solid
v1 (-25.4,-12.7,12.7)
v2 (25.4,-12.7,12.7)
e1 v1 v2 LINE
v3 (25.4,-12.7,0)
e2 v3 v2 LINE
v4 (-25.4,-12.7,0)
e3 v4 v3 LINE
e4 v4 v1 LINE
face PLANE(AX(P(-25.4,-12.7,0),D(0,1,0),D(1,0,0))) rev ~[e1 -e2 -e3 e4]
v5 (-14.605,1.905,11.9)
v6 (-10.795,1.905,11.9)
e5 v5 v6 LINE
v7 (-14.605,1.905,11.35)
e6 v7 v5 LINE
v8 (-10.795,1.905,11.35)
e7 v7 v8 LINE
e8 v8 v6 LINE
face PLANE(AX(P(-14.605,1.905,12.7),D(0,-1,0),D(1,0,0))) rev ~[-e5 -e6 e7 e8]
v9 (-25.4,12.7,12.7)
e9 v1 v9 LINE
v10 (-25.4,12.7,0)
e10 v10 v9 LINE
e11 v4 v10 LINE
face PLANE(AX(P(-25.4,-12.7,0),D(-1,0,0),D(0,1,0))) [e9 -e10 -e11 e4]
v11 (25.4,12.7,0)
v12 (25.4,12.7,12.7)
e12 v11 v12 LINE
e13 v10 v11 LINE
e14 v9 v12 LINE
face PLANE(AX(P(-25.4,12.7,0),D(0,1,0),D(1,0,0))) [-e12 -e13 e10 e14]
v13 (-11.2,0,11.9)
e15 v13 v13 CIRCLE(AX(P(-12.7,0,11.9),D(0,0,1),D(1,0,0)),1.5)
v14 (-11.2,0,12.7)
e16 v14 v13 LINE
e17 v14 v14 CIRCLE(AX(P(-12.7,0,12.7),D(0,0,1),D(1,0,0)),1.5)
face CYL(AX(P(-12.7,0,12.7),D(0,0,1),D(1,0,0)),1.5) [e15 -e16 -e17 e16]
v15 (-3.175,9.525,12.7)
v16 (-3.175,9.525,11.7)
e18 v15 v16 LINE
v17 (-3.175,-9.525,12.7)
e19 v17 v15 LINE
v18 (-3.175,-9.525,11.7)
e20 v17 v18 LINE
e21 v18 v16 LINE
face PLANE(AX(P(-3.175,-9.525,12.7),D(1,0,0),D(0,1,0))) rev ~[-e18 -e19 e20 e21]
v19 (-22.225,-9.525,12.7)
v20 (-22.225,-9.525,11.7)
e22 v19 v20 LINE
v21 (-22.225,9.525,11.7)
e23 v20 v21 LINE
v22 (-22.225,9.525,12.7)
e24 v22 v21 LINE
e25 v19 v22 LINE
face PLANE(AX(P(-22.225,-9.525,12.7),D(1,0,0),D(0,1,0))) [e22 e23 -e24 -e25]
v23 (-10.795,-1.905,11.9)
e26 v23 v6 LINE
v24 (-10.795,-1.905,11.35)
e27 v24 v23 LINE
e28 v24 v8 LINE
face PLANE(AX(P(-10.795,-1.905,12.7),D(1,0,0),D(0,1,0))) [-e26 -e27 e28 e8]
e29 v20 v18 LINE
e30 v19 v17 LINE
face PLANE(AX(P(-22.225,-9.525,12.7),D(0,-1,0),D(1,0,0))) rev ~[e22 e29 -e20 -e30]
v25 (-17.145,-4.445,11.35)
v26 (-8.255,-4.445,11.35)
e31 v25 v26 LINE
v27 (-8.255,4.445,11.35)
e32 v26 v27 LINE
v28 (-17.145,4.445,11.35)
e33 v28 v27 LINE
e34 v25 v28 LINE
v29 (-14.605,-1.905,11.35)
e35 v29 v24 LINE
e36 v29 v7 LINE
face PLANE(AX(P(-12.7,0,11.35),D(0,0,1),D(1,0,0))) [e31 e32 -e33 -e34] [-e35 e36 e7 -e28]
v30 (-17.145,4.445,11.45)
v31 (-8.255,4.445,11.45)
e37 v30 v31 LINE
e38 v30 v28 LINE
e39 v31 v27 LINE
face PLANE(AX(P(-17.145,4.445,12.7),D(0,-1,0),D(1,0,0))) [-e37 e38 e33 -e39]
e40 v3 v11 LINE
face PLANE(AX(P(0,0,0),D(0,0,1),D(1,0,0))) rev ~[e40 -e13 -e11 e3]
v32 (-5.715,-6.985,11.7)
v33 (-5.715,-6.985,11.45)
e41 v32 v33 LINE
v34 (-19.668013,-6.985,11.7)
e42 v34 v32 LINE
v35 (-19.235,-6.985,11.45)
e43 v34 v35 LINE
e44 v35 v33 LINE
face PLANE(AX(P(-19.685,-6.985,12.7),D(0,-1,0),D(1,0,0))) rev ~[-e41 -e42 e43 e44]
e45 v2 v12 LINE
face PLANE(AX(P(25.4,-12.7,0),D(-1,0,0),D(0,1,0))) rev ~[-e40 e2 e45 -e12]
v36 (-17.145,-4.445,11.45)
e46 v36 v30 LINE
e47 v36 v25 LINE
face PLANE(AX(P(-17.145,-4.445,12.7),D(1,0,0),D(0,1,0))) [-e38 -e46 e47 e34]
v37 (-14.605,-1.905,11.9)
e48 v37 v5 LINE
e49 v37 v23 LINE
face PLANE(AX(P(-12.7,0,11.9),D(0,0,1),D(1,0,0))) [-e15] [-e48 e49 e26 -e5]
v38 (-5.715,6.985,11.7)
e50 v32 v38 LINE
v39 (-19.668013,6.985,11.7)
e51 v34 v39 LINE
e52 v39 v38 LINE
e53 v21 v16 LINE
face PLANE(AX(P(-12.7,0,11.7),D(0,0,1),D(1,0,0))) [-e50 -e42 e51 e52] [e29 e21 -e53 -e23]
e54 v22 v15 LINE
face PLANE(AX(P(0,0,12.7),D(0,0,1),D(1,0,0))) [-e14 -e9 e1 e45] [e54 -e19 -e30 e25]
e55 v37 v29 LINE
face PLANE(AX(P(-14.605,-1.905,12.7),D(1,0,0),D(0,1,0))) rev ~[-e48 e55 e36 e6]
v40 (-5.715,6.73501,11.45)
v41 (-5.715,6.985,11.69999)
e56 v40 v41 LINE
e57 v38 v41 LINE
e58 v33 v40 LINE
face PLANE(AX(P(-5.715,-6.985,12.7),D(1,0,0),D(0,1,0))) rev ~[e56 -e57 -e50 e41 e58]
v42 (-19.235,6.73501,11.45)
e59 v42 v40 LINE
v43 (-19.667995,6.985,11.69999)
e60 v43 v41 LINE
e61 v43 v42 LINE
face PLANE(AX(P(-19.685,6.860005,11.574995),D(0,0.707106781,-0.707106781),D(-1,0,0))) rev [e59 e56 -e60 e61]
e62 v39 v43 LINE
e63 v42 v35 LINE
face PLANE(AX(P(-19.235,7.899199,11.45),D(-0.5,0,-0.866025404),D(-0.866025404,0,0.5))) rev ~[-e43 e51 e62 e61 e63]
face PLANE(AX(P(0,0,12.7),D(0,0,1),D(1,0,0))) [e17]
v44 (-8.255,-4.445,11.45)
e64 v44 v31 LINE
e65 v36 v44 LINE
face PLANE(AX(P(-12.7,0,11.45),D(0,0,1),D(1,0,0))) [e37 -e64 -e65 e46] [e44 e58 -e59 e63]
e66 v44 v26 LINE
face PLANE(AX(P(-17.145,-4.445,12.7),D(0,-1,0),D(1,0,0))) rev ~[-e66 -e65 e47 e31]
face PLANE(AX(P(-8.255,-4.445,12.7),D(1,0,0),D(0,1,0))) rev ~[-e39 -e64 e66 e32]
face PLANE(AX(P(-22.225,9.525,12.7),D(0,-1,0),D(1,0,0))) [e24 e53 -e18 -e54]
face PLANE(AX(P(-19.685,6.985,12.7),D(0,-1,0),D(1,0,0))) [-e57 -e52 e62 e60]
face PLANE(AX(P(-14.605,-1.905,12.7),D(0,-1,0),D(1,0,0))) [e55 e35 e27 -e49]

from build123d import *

# Parameters (mm, degrees)
F0_W        = 50.8
F0_H        = 25.4
F1_DEPTH    = 12.7
F2_W        = 19.05
F2_H        = 19.05
F2_W_2      = 13.97
F2_H_2      = 13.97
F2_W_3      = 8.89
F2_H_3      = 8.89
F2_W_4      = 3.81
F2_H_4      = 3.81
F3_DEPTH    = 1
F4_DEPTH    = 1.25
F5_DEPTH    = 1.35
F6_SIZE2    = 0.24999
F6_SIZE     = 0.24999
F7_T4_DEPTH = 16.0483871792
F8_W        = 3.81
F8_H        = 3.81
F8_R        = 1.5
F9_DEPTH    = 0.8


# Not quite as in the source:
# - a fillet or chamfer that OpenCascade refuses, or shapes differently, is made with other operations: its cross-section is extruded or revolved along the edge and cut away or added
# - a fillet or chamfer is up to 0.001 mm smaller than in the source, because OpenCascade refuses the exact size


with BuildPart() as f1:
    # F0 (on Top) → F1 (new body)
    with BuildSketch(Plane.XY):
        Rectangle(F0_W, F0_H)
    extrude(amount=F1_DEPTH)

    # F2 (on face) → F3 (cut)
    with BuildSketch(Plane.XY.offset(12.7)):
        with Locations((-12.7, 0)):
            Rectangle(F2_W, F2_H)
        with Locations((-12.7, 0)):
            Rectangle(F2_W_2, F2_H_2, mode=Mode.SUBTRACT)
        with Locations((-12.7, 0)):
            Rectangle(F2_W_2, F2_H_2)
        with Locations((-12.7, 0)):
            Rectangle(F2_W_3, F2_H_3, mode=Mode.SUBTRACT)
        with Locations((-12.7, 0)):
            Rectangle(F2_W_3, F2_H_3)
        with Locations((-12.7, 0)):
            Rectangle(F2_W_4, F2_H_4, mode=Mode.SUBTRACT)
    extrude(amount=-F3_DEPTH, mode=Mode.SUBTRACT)

    # F2 (on face) → F4 (cut)
    with BuildSketch(Plane.XY.offset(12.7)):
        with Locations((-12.7, 0)):
            Rectangle(F2_W_2, F2_H_2)
        with Locations((-12.7, 0)):
            Rectangle(F2_W_3, F2_H_3, mode=Mode.SUBTRACT)
    extrude(amount=-F4_DEPTH, mode=Mode.SUBTRACT)

    # F2 (on face) → F5 (cut)
    with BuildSketch(Plane.XY.offset(12.7)):
        with Locations((-12.7, 0)):
            Rectangle(F2_W_3, F2_H_3)
        with Locations((-12.7, 0)):
            Rectangle(F2_W_4, F2_H_4, mode=Mode.SUBTRACT)
    extrude(amount=-F5_DEPTH, mode=Mode.SUBTRACT)

    # F6 (size 0.25 and 0.25 in the source; OpenCascade refuses exactly that, so slightly less here)
    f6_edges = [f1.edges().sort_by_distance(p)[0] for p in [
        (-12.7, 6.985, 11.45),
    ]]
    chamfer(f6_edges, length=F6_SIZE, length2=F6_SIZE2)

    # F7: chamfer of 0.45 x 0.2598076211 on 1 edges, made by hand


with BuildPart() as f7_tool2:
    # F7_s3 → F7_t4 (new body)
    with BuildSketch(Plane.XZ.offset(-7.8991985896)):
        Polygon((-19.235, 11.45), (-19.685, 11.7098076211), (-19.685, 11.45), align=None)
    extrude(amount=F7_T4_DEPTH)

    split(bisect_by=Plane.XY.offset(11.7), keep=Keep.BOTTOM)


with BuildPart() as f1_1:
    add(f1.part)

    # F7_t1: union F7_tool2
    add(f7_tool2.part)

    # F8 (on face) → F9 (cut)
    with BuildSketch(Plane.XY.offset(12.7)):
        with Locations((-12.7, 0)):
            Rectangle(F8_W, F8_H)
        with Locations((-12.7, 0)):
            Circle(F8_R, mode=Mode.SUBTRACT)
    extrude(amount=-F9_DEPTH, mode=Mode.SUBTRACT)


solid = f1_1.part
